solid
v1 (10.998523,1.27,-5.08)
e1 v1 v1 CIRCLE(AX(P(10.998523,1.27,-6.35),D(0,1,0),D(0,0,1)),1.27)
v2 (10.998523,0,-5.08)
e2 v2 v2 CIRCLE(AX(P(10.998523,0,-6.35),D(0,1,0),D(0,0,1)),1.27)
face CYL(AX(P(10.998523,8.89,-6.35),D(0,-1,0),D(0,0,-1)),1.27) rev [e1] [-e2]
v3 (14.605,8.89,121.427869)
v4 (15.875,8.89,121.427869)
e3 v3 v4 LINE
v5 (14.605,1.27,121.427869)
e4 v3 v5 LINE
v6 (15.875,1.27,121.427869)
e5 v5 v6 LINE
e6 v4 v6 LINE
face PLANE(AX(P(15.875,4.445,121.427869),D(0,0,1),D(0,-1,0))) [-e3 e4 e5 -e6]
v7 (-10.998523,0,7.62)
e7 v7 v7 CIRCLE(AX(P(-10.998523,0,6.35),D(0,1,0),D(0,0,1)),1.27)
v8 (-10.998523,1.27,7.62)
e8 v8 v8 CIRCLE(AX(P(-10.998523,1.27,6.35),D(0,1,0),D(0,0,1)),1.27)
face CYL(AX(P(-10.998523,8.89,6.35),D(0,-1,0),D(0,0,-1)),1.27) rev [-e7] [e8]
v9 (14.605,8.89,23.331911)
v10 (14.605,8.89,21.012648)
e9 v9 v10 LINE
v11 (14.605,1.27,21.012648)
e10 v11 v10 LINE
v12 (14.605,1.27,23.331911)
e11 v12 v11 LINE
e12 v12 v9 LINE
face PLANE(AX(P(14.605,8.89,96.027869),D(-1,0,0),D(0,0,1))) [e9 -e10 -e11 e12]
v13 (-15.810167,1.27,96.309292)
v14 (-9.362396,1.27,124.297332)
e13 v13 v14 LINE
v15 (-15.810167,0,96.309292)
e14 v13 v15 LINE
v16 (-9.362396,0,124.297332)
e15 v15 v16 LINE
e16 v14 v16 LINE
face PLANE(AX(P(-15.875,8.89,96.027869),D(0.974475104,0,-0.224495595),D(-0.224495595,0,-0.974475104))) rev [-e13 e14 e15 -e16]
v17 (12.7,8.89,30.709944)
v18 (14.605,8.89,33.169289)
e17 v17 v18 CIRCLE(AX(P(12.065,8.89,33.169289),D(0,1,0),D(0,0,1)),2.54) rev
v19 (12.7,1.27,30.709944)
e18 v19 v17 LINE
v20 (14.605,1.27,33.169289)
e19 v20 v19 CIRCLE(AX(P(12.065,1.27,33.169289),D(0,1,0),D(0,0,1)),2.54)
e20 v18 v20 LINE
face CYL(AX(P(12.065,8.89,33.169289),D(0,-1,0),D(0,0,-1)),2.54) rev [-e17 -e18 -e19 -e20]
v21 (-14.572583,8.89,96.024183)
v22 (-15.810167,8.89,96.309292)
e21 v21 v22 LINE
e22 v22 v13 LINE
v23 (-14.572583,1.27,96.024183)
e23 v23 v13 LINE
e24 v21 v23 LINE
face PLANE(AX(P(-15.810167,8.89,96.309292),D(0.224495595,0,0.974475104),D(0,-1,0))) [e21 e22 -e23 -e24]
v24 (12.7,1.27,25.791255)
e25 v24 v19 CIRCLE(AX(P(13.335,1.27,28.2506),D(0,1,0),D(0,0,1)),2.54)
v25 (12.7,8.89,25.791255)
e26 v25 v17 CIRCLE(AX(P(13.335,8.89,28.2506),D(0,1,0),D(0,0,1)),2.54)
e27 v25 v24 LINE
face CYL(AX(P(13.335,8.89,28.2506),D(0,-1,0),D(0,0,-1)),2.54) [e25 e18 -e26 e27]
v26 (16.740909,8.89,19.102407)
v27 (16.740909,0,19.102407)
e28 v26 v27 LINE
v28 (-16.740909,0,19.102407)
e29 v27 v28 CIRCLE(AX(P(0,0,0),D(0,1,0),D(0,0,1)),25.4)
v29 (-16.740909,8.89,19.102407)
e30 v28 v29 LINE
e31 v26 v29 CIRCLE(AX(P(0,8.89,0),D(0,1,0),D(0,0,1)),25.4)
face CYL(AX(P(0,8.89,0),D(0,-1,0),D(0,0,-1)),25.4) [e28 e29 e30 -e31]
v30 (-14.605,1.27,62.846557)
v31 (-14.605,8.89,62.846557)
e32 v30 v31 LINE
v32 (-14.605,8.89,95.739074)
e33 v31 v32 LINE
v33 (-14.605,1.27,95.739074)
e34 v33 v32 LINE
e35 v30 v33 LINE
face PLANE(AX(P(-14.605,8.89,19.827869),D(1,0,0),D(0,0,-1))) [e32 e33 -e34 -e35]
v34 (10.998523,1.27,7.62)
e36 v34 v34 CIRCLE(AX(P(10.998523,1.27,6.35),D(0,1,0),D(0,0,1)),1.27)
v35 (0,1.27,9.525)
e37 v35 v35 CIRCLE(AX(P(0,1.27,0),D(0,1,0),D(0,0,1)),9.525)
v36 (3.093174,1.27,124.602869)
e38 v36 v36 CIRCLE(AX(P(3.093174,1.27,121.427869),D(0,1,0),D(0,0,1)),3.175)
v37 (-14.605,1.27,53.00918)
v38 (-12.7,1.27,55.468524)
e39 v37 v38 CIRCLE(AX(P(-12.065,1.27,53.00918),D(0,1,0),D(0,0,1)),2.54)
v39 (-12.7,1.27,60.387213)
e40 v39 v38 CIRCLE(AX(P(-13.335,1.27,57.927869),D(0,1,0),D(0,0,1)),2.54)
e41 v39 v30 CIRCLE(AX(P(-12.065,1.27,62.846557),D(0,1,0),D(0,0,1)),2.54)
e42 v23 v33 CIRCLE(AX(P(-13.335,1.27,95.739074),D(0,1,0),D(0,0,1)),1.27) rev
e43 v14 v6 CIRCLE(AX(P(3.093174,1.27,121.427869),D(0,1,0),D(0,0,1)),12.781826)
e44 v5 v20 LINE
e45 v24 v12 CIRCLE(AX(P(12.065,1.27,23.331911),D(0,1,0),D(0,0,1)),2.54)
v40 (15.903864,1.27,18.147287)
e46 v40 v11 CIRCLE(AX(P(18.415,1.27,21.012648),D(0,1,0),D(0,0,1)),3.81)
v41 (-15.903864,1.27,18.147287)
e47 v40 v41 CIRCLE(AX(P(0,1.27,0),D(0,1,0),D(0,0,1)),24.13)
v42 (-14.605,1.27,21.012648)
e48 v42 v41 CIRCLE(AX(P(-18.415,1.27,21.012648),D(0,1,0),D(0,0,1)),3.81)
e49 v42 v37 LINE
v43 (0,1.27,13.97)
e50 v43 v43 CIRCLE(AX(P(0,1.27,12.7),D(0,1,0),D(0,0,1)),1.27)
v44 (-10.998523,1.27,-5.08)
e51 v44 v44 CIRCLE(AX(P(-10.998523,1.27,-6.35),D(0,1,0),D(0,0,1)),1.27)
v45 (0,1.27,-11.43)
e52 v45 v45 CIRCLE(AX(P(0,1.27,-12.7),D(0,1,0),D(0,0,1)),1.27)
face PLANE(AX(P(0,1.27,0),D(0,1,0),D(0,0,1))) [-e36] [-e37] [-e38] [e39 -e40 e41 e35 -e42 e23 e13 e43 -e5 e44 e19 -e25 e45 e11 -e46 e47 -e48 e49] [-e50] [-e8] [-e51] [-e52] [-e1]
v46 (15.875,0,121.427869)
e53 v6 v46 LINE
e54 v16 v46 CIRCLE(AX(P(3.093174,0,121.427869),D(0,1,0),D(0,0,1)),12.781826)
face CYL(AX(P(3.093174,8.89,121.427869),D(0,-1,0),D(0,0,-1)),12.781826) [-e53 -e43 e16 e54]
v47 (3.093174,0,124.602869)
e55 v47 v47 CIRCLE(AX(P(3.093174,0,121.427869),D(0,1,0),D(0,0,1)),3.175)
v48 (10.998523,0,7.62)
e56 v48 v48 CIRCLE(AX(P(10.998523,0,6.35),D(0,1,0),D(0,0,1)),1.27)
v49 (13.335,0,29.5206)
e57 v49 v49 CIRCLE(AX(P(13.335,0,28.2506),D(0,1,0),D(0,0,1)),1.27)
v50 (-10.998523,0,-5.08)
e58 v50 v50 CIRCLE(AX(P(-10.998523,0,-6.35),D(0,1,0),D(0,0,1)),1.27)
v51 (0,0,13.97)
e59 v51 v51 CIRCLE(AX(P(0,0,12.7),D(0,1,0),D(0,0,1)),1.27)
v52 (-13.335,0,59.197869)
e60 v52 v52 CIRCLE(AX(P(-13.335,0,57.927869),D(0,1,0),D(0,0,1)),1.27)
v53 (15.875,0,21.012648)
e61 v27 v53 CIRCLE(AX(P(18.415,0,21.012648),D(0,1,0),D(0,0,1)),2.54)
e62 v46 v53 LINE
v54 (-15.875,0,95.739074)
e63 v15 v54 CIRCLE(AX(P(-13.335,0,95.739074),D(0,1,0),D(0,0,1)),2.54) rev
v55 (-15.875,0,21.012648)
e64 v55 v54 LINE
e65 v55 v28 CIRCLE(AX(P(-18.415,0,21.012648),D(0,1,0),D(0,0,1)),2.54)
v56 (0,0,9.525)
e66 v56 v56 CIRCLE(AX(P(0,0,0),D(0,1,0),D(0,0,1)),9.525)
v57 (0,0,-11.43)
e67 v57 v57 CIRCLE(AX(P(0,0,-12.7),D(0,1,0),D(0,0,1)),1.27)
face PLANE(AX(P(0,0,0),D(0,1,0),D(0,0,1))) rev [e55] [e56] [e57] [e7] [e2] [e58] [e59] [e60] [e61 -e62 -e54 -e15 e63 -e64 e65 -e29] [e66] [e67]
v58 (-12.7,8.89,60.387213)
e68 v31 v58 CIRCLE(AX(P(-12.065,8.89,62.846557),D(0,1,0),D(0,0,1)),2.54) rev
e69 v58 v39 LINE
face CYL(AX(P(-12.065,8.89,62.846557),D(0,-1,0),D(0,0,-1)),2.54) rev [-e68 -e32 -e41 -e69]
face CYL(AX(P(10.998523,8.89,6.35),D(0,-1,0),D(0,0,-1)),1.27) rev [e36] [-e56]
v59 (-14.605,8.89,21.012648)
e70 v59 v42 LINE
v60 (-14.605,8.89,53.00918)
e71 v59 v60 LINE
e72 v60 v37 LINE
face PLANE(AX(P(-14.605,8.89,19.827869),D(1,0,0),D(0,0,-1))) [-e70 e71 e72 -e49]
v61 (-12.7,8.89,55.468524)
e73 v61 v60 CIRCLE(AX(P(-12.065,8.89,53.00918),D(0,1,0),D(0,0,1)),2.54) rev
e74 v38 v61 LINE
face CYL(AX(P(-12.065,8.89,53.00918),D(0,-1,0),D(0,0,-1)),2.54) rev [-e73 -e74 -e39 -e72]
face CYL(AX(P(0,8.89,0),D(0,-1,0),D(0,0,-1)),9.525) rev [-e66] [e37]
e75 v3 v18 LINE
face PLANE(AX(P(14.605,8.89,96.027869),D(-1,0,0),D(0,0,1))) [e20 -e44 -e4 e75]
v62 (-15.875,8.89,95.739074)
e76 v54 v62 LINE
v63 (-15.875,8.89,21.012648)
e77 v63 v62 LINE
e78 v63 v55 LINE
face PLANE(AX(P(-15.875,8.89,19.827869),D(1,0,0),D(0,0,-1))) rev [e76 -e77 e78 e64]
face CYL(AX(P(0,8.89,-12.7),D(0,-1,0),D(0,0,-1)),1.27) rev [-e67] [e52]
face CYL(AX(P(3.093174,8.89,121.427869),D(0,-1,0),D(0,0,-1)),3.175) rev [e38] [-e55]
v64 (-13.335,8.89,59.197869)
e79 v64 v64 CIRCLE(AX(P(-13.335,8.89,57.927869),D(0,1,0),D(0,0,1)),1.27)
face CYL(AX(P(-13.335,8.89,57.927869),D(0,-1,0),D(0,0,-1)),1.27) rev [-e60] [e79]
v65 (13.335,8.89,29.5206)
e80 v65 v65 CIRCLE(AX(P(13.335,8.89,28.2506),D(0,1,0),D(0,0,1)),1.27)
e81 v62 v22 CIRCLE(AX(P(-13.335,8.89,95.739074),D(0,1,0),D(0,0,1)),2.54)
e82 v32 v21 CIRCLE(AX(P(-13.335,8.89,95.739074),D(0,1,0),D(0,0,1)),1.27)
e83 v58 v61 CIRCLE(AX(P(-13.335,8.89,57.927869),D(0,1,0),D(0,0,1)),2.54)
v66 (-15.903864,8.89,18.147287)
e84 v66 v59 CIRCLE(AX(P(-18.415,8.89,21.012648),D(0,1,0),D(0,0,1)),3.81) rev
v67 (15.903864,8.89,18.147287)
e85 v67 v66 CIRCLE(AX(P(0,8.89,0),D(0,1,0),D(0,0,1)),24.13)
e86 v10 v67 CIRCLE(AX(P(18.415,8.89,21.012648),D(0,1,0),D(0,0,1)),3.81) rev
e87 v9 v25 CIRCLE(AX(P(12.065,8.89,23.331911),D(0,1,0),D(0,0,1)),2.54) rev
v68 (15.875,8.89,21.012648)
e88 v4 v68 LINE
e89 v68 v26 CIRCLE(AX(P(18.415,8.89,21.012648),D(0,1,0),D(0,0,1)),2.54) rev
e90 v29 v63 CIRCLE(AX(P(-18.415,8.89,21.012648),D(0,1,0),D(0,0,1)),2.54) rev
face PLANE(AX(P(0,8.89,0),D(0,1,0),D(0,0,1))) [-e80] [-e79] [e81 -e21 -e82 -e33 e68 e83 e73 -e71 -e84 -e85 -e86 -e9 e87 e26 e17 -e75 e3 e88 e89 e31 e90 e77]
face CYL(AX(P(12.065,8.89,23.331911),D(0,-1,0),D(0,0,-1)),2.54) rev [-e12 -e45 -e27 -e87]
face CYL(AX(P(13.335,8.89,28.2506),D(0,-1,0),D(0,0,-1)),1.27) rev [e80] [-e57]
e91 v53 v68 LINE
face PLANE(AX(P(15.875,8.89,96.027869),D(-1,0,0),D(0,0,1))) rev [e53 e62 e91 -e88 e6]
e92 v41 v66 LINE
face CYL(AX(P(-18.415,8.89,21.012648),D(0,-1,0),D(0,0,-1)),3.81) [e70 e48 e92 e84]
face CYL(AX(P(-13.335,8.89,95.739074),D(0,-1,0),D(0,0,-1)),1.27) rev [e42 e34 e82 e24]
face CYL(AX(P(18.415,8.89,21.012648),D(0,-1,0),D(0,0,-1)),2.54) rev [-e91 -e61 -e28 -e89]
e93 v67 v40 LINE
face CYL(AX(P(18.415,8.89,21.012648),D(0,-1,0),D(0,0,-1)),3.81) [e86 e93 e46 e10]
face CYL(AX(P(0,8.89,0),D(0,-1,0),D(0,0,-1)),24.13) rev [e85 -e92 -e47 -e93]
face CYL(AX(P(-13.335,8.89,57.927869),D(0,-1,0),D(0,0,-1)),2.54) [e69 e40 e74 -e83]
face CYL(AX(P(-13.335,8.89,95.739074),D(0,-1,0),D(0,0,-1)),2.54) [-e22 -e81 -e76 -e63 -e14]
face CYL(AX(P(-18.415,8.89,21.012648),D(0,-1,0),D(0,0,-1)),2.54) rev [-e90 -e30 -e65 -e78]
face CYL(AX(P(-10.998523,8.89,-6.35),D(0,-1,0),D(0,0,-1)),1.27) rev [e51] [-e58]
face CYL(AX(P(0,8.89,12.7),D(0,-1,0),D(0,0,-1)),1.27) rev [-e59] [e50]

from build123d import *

# Parameters (mm, degrees)
SKETCH1_R           = 1.27
SKETCH1_R_2         = 3.175
SKETCH1_R_3         = 9.525
BOSS_EXTRUDE1_DEPTH = 8.89
FILLET1_R           = 2.54
SHELL2_START        = 1.27
SHELL2_OUTLINE_R    = 3.175
SHELL2_OUTLINE_R_2  = 1.27
SHELL2_OUTLINE_R_3  = 9.525
SHELL2_DEPTH        = 7.62
FILLET2_R           = 2.54


# Read off the part's stored shape, not the designer's step: Shell2
with BuildPart() as part:
    # Sketch1 → Boss-Extrude1 (new body)
    with BuildSketch(Plane(origin=(0, 0, 0), x_dir=(1, 0, 0), z_dir=(0, 1, 0))):
        with BuildLine():
            Line((-15.875, -19.827868645), (-15.875, -96.027868645))
            Line((-15.875, -96.027868645), (-9.362396438, -124.297332186))
            ThreePointArc((-9.362396438, -124.297332186), (4.537150087, -134.127868645), (15.875, -121.427868645))
            Line((15.875, -121.427868645), (15.875, -96.027868645))
            Line((15.875, -96.027868645), (15.875, -19.827868645))
            ThreePointArc((15.875, -19.827868645), (0, 25.4), (-15.875, -19.827868645))
        make_face()
        with Locations(Location((0, 12.7, 0), (0, 0, 270))):
            Circle(SKETCH1_R, mode=Mode.SUBTRACT)
        with Locations(Location((10.998522628, 6.35, 0), (0, 0, 270))):
            Circle(SKETCH1_R, mode=Mode.SUBTRACT)
        with Locations(Location((10.998522628, -6.35, 0), (0, 0, 270))):
            Circle(SKETCH1_R, mode=Mode.SUBTRACT)
        with Locations(Location((0, -12.7, 0), (0, 0, 270))):
            Circle(SKETCH1_R, mode=Mode.SUBTRACT)
        with Locations(Location((-10.998522628, -6.35, 0), (0, 0, 270))):
            Circle(SKETCH1_R, mode=Mode.SUBTRACT)
        with Locations(Location((-10.998522628, 6.35, 0), (0, 0, 270))):
            Circle(SKETCH1_R, mode=Mode.SUBTRACT)
        with Locations(Location((3.093174395, -121.427868645, 0), (0, 0, 270))):
            Circle(SKETCH1_R_2, mode=Mode.SUBTRACT)
        with Locations(Location((-13.335, -57.927868645, 0), (0, 0, 270))):
            Circle(SKETCH1_R, mode=Mode.SUBTRACT)
        with Locations(Location((13.335, -28.25059986, 0), (0, 0, 270))):
            Circle(SKETCH1_R, mode=Mode.SUBTRACT)
        with Locations(Location((0, 0, 0), (0, 0, 270))):
            Circle(SKETCH1_R_3, mode=Mode.SUBTRACT)
    extrude(amount=BOSS_EXTRUDE1_DEPTH)

    # Fillet1
    fillet1_edges = [part.edges().sort_by_distance(p)[0] for p in [
        (15.875, 4.445, 19.827868645),
        (-15.875, 4.445, 96.027868645),
        (-15.875, 4.445, 19.827868645),
    ]]
    fillet(fillet1_edges, radius=FILLET1_R)

    # Shell2 outline → Shell2 (cut)
    with BuildSketch(Plane(origin=(0, 0, 0), x_dir=(1, 0, 0), z_dir=(0, 1, 0)).offset(SHELL2_START)):
        with BuildLine():
            Line((14.605, -121.427868645), (14.605, -30.450304386))
            ThreePointArc((14.605, -30.450304386), (10.795, -28.25059986), (14.605, -26.050895335))
            Line((14.605, -26.050895335), (14.605, -21.012647977))
            ThreePointArc((14.605, -21.012647977), (14.944875395, -19.439645997), (15.903863636, -18.147286889))
            ThreePointArc((15.903863636, -18.147286889), (0, 24.13), (-15.903863636, -18.147286889))
            ThreePointArc((-15.903863636, -18.147286889), (-14.944875395, -19.439645997), (-14.605, -21.012647977))
            Line((-14.605, -21.012647977), (-14.605, -55.728164119))
            ThreePointArc((-14.605, -55.728164119), (-10.795, -57.927868645), (-14.605, -60.127573171))
            Line((-14.605, -60.127573171), (-14.605, -95.739073507))
            ThreePointArc((-14.605, -95.739073507), (-14.596869822, -95.882546684), (-14.572583382, -96.024182912))
            Line((-14.572583382, -96.024182912), (-15.810166764, -96.309292317))
            Line((-15.810166764, -96.309292317), (-9.362396438, -124.297332186))
            ThreePointArc((-9.362396438, -124.297332186), (4.537150087, -134.127868645), (15.875, -121.427868645))
            Line((15.875, -121.427868645), (14.605, -121.427868645))
        make_face()
        with Locations((3.093174395, -121.427868645)):
            Circle(SHELL2_OUTLINE_R, mode=Mode.SUBTRACT)
        with Locations((-10.998522628, -6.35)):
            Circle(SHELL2_OUTLINE_R_2, mode=Mode.SUBTRACT)
        with Locations((0, -12.7)):
            Circle(SHELL2_OUTLINE_R_2, mode=Mode.SUBTRACT)
        Circle(SHELL2_OUTLINE_R_3, mode=Mode.SUBTRACT)
        with Locations((-10.998522628, 6.35)):
            Circle(SHELL2_OUTLINE_R_2, mode=Mode.SUBTRACT)
        with Locations((0, 12.7)):
            Circle(SHELL2_OUTLINE_R_2, mode=Mode.SUBTRACT)
        with Locations((10.998522628, -6.35)):
            Circle(SHELL2_OUTLINE_R_2, mode=Mode.SUBTRACT)
        with Locations((10.998522628, 6.35)):
            Circle(SHELL2_OUTLINE_R_2, mode=Mode.SUBTRACT)
    extrude(amount=SHELL2_DEPTH, mode=Mode.SUBTRACT)

    # Fillet2
    fillet2_edges = [part.edges().sort_by_distance(p)[0] for p in [
        (14.605, 5.08, 30.450304386),
        (-14.605, 5.08, 55.728164119),
        (-14.605, 5.08, 60.127573171),
        (14.605, 5.08, 26.050895335),
    ]]
    fillet(fillet2_edges, radius=FILLET2_R)


solid = part.part
